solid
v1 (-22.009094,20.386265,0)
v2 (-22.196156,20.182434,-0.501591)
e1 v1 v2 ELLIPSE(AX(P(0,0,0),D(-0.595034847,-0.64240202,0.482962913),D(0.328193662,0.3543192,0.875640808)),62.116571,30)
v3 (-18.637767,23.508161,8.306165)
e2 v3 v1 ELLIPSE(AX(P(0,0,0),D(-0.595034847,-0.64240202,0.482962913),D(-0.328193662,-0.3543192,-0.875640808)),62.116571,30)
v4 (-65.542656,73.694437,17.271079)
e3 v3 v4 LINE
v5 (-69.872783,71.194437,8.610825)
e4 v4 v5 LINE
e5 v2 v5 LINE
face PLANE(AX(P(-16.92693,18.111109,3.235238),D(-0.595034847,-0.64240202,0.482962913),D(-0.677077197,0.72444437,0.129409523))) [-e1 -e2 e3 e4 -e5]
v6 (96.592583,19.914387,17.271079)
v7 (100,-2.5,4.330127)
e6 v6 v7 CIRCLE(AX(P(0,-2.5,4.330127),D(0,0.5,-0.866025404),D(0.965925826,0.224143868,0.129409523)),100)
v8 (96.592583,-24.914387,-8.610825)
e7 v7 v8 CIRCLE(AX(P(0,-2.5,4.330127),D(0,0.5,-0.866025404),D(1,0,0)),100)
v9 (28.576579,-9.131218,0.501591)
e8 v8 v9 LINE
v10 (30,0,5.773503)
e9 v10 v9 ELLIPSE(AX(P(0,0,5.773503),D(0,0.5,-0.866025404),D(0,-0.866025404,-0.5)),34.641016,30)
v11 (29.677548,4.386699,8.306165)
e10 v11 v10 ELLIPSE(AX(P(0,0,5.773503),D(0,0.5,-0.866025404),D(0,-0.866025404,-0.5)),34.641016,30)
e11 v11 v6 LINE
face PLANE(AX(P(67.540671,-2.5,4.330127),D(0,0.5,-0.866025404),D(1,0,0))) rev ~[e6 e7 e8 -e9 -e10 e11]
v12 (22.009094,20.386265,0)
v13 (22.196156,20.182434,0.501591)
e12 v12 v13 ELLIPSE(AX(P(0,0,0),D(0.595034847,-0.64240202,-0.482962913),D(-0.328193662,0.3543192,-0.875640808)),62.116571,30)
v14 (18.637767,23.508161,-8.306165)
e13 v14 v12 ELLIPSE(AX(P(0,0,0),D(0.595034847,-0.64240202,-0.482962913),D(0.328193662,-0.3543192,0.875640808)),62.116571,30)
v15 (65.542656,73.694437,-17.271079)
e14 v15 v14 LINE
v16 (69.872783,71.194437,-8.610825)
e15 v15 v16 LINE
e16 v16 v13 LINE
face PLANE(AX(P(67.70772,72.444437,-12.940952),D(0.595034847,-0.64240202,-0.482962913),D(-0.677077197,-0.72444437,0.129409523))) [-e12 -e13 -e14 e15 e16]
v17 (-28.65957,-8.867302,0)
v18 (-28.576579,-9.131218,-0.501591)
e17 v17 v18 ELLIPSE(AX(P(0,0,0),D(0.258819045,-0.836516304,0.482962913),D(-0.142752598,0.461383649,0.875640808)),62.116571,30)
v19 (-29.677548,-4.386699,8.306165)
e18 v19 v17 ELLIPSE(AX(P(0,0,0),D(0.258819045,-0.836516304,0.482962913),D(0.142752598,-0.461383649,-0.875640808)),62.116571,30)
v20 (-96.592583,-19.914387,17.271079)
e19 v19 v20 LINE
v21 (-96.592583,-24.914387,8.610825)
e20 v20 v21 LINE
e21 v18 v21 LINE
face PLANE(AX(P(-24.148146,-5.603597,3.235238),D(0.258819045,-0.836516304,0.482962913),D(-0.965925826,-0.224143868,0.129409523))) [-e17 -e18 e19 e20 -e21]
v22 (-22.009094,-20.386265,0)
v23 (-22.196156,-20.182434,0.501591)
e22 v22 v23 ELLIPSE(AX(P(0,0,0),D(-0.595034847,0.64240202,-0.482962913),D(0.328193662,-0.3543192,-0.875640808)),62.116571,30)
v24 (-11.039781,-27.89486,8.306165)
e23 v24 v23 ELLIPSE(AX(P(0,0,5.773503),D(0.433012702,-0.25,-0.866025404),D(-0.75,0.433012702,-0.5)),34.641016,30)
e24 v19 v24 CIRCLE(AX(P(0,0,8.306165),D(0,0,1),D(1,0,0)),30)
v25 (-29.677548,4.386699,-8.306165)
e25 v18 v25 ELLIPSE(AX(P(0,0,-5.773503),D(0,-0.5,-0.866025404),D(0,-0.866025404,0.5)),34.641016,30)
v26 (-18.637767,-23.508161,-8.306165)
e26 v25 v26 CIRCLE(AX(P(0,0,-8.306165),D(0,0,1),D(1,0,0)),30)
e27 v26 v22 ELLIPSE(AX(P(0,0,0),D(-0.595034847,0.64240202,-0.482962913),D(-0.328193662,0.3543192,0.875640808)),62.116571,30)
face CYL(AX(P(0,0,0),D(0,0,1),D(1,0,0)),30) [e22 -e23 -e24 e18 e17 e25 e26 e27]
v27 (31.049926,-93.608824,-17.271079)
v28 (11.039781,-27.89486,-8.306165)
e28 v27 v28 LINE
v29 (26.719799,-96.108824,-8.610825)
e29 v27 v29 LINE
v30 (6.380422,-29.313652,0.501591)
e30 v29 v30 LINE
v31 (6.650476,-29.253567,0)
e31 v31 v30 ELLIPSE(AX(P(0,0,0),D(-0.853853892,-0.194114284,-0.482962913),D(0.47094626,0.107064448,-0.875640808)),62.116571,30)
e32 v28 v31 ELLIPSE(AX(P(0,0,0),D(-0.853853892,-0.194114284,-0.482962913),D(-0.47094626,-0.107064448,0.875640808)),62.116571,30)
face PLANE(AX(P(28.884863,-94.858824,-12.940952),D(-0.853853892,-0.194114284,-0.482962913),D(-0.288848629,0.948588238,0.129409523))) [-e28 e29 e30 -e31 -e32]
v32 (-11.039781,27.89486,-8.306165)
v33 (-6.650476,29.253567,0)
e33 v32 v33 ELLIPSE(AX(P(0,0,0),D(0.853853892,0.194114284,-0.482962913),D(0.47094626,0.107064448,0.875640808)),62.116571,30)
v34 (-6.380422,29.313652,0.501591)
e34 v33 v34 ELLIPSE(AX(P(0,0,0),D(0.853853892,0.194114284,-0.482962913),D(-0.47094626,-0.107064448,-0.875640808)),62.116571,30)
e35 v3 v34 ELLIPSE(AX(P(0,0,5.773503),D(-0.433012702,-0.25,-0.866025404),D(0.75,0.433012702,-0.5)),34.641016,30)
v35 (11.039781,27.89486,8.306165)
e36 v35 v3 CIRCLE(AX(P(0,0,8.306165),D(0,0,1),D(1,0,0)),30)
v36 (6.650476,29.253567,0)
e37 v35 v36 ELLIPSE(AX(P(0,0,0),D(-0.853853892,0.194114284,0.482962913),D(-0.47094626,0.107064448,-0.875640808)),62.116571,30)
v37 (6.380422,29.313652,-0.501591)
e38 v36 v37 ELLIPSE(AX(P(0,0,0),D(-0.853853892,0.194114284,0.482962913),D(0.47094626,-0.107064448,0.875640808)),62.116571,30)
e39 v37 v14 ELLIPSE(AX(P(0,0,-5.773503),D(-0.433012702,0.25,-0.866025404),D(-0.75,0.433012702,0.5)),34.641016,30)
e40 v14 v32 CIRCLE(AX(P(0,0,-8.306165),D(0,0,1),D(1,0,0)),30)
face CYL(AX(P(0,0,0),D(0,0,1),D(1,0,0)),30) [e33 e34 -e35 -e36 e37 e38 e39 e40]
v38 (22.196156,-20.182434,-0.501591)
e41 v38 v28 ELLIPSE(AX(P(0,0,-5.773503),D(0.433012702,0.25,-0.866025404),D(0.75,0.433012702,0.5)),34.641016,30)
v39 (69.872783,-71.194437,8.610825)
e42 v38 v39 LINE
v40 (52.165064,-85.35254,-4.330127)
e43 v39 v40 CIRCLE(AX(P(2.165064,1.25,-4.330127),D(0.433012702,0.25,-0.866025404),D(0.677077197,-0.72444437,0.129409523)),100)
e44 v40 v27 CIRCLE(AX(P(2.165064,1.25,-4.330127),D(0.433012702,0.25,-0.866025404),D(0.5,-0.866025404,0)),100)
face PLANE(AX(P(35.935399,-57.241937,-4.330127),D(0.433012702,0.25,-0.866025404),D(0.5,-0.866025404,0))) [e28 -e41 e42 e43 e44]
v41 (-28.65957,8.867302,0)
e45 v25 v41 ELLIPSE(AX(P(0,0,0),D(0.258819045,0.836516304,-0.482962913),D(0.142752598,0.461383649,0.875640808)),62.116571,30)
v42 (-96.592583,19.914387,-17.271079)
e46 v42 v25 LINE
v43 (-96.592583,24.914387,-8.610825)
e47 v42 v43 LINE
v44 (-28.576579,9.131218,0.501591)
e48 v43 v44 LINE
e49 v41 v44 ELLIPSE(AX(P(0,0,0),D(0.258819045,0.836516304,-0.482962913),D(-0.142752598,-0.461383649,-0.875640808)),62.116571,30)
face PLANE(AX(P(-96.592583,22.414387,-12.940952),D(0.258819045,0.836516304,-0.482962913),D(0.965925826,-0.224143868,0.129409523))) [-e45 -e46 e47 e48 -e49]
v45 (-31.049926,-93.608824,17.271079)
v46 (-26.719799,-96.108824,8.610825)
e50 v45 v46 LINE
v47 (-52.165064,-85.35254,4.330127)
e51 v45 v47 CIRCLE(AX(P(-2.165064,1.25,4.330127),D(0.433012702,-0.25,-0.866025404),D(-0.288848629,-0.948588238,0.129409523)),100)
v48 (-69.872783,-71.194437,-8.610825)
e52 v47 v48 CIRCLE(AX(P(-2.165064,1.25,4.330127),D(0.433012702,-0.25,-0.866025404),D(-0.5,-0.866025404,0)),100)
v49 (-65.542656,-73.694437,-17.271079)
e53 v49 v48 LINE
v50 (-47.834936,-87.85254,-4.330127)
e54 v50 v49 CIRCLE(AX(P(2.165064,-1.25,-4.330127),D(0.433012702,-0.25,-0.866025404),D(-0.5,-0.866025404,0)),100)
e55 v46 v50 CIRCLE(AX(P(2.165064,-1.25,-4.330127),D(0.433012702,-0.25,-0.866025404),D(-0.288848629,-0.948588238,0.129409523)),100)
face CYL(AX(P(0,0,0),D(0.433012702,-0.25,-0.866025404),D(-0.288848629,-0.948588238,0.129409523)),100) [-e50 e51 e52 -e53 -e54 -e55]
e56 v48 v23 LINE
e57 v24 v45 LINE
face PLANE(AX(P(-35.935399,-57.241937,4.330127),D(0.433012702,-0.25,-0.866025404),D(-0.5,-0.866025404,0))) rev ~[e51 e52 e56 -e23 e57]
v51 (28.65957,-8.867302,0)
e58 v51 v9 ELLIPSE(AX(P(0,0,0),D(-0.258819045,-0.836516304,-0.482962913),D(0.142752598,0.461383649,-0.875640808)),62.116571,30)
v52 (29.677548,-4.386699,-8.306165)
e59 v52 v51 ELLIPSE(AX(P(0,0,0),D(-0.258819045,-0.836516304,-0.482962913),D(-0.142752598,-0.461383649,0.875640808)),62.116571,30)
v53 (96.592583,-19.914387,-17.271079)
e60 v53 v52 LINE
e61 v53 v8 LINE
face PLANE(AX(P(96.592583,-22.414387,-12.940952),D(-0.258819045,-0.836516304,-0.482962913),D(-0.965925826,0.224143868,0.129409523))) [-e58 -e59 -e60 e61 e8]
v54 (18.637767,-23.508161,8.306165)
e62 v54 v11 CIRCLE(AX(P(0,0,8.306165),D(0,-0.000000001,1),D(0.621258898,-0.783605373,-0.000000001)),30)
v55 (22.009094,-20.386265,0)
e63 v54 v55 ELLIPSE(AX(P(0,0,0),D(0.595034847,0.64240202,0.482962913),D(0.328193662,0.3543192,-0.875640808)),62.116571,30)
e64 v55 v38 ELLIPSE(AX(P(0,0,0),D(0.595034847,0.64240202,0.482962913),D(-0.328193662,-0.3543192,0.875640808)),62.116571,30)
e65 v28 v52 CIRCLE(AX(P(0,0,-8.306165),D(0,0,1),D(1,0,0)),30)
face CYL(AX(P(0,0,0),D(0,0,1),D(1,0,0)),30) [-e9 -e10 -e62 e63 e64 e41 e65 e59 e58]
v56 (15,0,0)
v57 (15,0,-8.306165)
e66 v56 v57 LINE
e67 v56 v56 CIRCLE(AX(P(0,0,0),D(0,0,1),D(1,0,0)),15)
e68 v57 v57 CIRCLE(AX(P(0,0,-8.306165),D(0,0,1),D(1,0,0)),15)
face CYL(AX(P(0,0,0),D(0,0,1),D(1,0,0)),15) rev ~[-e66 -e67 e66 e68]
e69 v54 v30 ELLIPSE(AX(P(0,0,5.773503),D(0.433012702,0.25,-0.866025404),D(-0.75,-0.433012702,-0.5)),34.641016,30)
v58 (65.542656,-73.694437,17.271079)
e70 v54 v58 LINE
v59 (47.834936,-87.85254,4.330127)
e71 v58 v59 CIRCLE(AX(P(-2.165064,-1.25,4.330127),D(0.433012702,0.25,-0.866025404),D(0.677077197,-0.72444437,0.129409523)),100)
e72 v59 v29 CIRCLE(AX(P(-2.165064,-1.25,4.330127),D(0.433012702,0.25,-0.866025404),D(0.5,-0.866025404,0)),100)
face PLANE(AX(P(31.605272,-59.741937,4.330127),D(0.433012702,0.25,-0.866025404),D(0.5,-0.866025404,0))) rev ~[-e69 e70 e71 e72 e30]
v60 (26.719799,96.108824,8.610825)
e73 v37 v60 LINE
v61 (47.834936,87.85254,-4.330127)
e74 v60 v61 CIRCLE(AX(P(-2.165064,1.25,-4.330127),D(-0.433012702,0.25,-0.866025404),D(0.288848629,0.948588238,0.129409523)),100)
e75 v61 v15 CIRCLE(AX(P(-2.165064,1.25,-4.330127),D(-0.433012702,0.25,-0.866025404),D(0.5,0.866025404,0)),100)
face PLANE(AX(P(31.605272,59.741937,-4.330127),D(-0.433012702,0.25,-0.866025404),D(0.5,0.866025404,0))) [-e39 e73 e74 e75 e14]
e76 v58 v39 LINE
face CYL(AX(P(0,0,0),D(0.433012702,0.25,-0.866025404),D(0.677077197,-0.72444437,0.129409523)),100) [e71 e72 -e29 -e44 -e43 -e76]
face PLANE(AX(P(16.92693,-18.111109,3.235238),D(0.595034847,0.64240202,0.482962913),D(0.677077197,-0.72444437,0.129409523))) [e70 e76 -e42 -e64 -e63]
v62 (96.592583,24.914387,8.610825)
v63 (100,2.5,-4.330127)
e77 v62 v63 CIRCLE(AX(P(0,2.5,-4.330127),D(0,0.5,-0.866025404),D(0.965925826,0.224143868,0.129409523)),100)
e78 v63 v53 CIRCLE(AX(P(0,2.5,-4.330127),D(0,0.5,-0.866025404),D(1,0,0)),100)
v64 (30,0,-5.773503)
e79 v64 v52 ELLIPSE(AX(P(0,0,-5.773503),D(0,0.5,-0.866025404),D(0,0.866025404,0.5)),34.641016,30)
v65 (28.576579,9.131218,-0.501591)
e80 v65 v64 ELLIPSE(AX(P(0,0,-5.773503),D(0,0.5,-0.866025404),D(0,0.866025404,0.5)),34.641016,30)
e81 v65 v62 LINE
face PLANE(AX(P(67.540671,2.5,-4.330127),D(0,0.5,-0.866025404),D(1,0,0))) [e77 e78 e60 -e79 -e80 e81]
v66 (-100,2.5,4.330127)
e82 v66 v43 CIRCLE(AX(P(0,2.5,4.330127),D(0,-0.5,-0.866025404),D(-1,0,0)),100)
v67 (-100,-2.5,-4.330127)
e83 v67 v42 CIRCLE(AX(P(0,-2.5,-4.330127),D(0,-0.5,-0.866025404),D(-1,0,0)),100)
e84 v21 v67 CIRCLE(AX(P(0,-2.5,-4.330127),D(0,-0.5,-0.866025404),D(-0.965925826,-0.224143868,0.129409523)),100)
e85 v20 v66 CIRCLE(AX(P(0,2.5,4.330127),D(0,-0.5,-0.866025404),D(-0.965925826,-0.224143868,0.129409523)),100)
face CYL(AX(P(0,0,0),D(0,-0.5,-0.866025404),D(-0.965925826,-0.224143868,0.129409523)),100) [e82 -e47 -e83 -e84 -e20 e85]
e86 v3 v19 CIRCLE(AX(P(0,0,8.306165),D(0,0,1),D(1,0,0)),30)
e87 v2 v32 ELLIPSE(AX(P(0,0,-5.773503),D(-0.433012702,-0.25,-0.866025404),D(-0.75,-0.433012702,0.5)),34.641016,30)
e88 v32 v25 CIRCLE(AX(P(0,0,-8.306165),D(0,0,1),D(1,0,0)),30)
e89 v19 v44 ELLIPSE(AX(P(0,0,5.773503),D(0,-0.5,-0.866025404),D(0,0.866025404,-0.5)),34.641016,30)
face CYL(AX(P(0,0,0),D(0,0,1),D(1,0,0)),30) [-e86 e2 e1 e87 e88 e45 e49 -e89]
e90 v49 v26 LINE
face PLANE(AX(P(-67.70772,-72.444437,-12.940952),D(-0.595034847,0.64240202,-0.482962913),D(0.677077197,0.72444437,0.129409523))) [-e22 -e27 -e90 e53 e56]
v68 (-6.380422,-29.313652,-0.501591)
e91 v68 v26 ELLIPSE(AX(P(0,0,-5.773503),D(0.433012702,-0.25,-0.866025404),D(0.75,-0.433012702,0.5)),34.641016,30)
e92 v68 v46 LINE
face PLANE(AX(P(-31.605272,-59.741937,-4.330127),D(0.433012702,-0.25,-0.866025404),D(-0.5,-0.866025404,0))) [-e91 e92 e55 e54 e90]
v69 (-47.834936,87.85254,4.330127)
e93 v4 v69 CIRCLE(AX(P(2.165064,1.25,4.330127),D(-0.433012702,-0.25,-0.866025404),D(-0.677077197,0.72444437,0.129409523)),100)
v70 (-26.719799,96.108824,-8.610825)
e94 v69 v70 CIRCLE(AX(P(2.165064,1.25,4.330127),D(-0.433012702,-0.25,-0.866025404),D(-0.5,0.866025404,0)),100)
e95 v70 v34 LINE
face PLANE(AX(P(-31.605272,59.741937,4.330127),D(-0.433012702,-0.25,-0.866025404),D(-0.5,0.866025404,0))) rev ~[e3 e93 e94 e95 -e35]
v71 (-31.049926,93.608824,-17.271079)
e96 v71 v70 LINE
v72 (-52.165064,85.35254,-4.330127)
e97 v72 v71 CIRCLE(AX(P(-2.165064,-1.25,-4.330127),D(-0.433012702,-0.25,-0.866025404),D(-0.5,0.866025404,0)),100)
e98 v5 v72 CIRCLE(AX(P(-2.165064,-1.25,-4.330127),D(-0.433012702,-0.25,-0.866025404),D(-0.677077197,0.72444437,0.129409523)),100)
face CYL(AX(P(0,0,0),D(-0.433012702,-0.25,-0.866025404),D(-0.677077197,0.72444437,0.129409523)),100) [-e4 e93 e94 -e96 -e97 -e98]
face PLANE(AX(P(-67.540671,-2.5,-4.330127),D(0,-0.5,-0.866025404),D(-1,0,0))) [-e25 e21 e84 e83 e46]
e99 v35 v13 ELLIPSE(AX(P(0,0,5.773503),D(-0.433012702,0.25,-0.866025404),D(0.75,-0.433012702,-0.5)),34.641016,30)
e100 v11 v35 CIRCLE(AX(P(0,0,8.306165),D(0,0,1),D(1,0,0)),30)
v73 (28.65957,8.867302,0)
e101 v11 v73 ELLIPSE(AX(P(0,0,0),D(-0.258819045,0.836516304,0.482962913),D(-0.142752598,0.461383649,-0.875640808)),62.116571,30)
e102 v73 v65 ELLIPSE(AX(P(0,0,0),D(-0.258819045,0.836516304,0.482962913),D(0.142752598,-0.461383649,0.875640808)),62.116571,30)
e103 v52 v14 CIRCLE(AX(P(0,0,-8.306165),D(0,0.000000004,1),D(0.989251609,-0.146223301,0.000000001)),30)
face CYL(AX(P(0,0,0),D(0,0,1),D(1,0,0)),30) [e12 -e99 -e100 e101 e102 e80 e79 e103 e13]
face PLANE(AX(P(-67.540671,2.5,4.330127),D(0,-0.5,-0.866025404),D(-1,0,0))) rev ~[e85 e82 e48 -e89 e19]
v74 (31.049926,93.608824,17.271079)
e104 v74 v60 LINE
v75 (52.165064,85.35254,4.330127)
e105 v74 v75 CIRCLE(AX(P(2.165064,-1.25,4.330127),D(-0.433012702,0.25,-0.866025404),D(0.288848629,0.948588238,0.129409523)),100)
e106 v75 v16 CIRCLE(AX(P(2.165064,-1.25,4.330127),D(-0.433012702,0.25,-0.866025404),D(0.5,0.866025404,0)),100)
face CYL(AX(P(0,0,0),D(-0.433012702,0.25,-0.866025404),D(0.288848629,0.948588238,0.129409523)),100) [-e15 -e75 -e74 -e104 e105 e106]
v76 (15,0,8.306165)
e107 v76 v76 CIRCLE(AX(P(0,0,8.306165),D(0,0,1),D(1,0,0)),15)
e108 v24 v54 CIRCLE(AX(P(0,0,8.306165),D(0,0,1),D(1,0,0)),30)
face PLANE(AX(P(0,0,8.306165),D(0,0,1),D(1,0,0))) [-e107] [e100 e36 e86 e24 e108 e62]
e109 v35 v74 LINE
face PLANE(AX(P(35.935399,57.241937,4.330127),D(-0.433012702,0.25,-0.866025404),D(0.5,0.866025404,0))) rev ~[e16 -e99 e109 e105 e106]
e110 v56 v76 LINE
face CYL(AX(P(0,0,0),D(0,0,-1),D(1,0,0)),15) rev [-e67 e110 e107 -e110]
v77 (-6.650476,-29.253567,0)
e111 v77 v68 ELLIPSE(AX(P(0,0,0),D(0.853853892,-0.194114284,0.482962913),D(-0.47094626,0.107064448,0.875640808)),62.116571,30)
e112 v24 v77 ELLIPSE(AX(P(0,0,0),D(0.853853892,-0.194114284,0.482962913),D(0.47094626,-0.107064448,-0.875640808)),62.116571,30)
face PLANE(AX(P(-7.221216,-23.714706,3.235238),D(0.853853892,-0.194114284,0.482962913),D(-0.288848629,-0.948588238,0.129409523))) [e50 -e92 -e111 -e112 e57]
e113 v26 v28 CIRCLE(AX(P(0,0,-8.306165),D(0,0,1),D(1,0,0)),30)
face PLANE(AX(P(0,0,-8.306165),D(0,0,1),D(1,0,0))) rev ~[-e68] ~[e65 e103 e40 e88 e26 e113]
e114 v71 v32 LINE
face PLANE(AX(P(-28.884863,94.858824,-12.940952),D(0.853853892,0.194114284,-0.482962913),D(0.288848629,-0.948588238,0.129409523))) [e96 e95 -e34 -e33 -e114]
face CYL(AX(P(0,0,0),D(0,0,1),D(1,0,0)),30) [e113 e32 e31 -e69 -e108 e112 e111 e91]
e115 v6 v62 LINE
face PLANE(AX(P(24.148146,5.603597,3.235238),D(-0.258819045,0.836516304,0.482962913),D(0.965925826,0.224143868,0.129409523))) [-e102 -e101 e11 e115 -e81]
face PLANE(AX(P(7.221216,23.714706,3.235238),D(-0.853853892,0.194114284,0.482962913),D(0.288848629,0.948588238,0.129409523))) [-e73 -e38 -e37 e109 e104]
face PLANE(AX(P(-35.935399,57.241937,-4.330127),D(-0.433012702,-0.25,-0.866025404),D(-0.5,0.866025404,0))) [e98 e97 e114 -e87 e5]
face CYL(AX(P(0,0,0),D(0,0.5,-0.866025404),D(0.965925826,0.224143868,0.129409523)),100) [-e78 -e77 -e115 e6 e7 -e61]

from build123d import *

# Parameters (mm, degrees)
F3_DEPTH      = 5
F3_DEPTH_BACK = 5
F5_COUNT      = 6
F6_R          = 30
F6_R_2        = 15
F8_DEPTH      = 8.3061646
F8_DEPTH_BACK = 8.3061646


# Not quite as in the source:
# - an extrude ends at something that could not be found from the text; its depth is read off the source's solid
# - a feature of the source that left no trace in its solid (it failed there, or was rolled back) is left out


with BuildPart() as f3:
    # F2 (on line) → F3 (new body, two sides)
    with BuildSketch(Plane(origin=(0, 0, 0), x_dir=(1, 0, 0), z_dir=(0, 0.5, -0.8660254038))) as f3_sk:
        with BuildLine():
            ThreePointArc((25, 0), (24.7861215343, -3.2631548055), (24.1481456572, -6.4704761276))
            Line((24.1481456572, -6.4704761276), (96.5925826289, -25.8819045103))
            ThreePointArc((96.5925826289, -25.8819045103), (99.1444861374, -13.052619222), (100, 0))
            ThreePointArc((100, 0), (99.1444861374, 13.052619222), (96.5925826289, 25.8819045103))
            Line((96.5925826289, 25.8819045103), (24.1481456572, 6.4704761276))
            ThreePointArc((24.1481456572, 6.4704761276), (24.7861215343, 3.2631548055), (25, 0))
        make_face()
    extrude(amount=F3_DEPTH)
    extrude(f3_sk.sketch, amount=-F3_DEPTH_BACK)


with BuildPart() as f5_1:
    # F5: instance of F3
    add(f3.part.rotate(Axis((0, 0, -4.0518213063), (0, 0, -1)), 1 * 360 / F5_COUNT))


with BuildPart() as f5_2:
    # F5: instance of F3
    add(f3.part.rotate(Axis((0, 0, -4.0518213063), (0, 0, -1)), 2 * 360 / F5_COUNT))


with BuildPart() as f5_3:
    # F5: instance of F3
    add(f3.part.rotate(Axis((0, 0, -4.0518213063), (0, 0, -1)), 3 * 360 / F5_COUNT))


with BuildPart() as f5_4:
    # F5: instance of F3
    add(f3.part.rotate(Axis((0, 0, -4.0518213063), (0, 0, -1)), 4 * 360 / F5_COUNT))


with BuildPart() as f5_5:
    # F5: instance of F3
    add(f3.part.rotate(Axis((0, 0, -4.0518213063), (0, 0, -1)), 5 * 360 / F5_COUNT))


with BuildPart() as f3_1:
    add(f3.part)

    add(f5_1.part)  # F8 merges F5_1

    add(f5_2.part)  # F8 merges F5_2

    add(f5_3.part)  # F8 merges F5_3

    add(f5_4.part)  # F8 merges F5_4

    add(f5_5.part)  # F8 merges F5_5
    # F6 (on Top) → F8 (join, two sides)
    with BuildSketch(Plane.XY) as f8_sk:
        Circle(F6_R)
        Circle(F6_R_2, mode=Mode.SUBTRACT)
    extrude(amount=F8_DEPTH)
    extrude(f8_sk.sketch, amount=-F8_DEPTH_BACK)


solid = f3_1.part
